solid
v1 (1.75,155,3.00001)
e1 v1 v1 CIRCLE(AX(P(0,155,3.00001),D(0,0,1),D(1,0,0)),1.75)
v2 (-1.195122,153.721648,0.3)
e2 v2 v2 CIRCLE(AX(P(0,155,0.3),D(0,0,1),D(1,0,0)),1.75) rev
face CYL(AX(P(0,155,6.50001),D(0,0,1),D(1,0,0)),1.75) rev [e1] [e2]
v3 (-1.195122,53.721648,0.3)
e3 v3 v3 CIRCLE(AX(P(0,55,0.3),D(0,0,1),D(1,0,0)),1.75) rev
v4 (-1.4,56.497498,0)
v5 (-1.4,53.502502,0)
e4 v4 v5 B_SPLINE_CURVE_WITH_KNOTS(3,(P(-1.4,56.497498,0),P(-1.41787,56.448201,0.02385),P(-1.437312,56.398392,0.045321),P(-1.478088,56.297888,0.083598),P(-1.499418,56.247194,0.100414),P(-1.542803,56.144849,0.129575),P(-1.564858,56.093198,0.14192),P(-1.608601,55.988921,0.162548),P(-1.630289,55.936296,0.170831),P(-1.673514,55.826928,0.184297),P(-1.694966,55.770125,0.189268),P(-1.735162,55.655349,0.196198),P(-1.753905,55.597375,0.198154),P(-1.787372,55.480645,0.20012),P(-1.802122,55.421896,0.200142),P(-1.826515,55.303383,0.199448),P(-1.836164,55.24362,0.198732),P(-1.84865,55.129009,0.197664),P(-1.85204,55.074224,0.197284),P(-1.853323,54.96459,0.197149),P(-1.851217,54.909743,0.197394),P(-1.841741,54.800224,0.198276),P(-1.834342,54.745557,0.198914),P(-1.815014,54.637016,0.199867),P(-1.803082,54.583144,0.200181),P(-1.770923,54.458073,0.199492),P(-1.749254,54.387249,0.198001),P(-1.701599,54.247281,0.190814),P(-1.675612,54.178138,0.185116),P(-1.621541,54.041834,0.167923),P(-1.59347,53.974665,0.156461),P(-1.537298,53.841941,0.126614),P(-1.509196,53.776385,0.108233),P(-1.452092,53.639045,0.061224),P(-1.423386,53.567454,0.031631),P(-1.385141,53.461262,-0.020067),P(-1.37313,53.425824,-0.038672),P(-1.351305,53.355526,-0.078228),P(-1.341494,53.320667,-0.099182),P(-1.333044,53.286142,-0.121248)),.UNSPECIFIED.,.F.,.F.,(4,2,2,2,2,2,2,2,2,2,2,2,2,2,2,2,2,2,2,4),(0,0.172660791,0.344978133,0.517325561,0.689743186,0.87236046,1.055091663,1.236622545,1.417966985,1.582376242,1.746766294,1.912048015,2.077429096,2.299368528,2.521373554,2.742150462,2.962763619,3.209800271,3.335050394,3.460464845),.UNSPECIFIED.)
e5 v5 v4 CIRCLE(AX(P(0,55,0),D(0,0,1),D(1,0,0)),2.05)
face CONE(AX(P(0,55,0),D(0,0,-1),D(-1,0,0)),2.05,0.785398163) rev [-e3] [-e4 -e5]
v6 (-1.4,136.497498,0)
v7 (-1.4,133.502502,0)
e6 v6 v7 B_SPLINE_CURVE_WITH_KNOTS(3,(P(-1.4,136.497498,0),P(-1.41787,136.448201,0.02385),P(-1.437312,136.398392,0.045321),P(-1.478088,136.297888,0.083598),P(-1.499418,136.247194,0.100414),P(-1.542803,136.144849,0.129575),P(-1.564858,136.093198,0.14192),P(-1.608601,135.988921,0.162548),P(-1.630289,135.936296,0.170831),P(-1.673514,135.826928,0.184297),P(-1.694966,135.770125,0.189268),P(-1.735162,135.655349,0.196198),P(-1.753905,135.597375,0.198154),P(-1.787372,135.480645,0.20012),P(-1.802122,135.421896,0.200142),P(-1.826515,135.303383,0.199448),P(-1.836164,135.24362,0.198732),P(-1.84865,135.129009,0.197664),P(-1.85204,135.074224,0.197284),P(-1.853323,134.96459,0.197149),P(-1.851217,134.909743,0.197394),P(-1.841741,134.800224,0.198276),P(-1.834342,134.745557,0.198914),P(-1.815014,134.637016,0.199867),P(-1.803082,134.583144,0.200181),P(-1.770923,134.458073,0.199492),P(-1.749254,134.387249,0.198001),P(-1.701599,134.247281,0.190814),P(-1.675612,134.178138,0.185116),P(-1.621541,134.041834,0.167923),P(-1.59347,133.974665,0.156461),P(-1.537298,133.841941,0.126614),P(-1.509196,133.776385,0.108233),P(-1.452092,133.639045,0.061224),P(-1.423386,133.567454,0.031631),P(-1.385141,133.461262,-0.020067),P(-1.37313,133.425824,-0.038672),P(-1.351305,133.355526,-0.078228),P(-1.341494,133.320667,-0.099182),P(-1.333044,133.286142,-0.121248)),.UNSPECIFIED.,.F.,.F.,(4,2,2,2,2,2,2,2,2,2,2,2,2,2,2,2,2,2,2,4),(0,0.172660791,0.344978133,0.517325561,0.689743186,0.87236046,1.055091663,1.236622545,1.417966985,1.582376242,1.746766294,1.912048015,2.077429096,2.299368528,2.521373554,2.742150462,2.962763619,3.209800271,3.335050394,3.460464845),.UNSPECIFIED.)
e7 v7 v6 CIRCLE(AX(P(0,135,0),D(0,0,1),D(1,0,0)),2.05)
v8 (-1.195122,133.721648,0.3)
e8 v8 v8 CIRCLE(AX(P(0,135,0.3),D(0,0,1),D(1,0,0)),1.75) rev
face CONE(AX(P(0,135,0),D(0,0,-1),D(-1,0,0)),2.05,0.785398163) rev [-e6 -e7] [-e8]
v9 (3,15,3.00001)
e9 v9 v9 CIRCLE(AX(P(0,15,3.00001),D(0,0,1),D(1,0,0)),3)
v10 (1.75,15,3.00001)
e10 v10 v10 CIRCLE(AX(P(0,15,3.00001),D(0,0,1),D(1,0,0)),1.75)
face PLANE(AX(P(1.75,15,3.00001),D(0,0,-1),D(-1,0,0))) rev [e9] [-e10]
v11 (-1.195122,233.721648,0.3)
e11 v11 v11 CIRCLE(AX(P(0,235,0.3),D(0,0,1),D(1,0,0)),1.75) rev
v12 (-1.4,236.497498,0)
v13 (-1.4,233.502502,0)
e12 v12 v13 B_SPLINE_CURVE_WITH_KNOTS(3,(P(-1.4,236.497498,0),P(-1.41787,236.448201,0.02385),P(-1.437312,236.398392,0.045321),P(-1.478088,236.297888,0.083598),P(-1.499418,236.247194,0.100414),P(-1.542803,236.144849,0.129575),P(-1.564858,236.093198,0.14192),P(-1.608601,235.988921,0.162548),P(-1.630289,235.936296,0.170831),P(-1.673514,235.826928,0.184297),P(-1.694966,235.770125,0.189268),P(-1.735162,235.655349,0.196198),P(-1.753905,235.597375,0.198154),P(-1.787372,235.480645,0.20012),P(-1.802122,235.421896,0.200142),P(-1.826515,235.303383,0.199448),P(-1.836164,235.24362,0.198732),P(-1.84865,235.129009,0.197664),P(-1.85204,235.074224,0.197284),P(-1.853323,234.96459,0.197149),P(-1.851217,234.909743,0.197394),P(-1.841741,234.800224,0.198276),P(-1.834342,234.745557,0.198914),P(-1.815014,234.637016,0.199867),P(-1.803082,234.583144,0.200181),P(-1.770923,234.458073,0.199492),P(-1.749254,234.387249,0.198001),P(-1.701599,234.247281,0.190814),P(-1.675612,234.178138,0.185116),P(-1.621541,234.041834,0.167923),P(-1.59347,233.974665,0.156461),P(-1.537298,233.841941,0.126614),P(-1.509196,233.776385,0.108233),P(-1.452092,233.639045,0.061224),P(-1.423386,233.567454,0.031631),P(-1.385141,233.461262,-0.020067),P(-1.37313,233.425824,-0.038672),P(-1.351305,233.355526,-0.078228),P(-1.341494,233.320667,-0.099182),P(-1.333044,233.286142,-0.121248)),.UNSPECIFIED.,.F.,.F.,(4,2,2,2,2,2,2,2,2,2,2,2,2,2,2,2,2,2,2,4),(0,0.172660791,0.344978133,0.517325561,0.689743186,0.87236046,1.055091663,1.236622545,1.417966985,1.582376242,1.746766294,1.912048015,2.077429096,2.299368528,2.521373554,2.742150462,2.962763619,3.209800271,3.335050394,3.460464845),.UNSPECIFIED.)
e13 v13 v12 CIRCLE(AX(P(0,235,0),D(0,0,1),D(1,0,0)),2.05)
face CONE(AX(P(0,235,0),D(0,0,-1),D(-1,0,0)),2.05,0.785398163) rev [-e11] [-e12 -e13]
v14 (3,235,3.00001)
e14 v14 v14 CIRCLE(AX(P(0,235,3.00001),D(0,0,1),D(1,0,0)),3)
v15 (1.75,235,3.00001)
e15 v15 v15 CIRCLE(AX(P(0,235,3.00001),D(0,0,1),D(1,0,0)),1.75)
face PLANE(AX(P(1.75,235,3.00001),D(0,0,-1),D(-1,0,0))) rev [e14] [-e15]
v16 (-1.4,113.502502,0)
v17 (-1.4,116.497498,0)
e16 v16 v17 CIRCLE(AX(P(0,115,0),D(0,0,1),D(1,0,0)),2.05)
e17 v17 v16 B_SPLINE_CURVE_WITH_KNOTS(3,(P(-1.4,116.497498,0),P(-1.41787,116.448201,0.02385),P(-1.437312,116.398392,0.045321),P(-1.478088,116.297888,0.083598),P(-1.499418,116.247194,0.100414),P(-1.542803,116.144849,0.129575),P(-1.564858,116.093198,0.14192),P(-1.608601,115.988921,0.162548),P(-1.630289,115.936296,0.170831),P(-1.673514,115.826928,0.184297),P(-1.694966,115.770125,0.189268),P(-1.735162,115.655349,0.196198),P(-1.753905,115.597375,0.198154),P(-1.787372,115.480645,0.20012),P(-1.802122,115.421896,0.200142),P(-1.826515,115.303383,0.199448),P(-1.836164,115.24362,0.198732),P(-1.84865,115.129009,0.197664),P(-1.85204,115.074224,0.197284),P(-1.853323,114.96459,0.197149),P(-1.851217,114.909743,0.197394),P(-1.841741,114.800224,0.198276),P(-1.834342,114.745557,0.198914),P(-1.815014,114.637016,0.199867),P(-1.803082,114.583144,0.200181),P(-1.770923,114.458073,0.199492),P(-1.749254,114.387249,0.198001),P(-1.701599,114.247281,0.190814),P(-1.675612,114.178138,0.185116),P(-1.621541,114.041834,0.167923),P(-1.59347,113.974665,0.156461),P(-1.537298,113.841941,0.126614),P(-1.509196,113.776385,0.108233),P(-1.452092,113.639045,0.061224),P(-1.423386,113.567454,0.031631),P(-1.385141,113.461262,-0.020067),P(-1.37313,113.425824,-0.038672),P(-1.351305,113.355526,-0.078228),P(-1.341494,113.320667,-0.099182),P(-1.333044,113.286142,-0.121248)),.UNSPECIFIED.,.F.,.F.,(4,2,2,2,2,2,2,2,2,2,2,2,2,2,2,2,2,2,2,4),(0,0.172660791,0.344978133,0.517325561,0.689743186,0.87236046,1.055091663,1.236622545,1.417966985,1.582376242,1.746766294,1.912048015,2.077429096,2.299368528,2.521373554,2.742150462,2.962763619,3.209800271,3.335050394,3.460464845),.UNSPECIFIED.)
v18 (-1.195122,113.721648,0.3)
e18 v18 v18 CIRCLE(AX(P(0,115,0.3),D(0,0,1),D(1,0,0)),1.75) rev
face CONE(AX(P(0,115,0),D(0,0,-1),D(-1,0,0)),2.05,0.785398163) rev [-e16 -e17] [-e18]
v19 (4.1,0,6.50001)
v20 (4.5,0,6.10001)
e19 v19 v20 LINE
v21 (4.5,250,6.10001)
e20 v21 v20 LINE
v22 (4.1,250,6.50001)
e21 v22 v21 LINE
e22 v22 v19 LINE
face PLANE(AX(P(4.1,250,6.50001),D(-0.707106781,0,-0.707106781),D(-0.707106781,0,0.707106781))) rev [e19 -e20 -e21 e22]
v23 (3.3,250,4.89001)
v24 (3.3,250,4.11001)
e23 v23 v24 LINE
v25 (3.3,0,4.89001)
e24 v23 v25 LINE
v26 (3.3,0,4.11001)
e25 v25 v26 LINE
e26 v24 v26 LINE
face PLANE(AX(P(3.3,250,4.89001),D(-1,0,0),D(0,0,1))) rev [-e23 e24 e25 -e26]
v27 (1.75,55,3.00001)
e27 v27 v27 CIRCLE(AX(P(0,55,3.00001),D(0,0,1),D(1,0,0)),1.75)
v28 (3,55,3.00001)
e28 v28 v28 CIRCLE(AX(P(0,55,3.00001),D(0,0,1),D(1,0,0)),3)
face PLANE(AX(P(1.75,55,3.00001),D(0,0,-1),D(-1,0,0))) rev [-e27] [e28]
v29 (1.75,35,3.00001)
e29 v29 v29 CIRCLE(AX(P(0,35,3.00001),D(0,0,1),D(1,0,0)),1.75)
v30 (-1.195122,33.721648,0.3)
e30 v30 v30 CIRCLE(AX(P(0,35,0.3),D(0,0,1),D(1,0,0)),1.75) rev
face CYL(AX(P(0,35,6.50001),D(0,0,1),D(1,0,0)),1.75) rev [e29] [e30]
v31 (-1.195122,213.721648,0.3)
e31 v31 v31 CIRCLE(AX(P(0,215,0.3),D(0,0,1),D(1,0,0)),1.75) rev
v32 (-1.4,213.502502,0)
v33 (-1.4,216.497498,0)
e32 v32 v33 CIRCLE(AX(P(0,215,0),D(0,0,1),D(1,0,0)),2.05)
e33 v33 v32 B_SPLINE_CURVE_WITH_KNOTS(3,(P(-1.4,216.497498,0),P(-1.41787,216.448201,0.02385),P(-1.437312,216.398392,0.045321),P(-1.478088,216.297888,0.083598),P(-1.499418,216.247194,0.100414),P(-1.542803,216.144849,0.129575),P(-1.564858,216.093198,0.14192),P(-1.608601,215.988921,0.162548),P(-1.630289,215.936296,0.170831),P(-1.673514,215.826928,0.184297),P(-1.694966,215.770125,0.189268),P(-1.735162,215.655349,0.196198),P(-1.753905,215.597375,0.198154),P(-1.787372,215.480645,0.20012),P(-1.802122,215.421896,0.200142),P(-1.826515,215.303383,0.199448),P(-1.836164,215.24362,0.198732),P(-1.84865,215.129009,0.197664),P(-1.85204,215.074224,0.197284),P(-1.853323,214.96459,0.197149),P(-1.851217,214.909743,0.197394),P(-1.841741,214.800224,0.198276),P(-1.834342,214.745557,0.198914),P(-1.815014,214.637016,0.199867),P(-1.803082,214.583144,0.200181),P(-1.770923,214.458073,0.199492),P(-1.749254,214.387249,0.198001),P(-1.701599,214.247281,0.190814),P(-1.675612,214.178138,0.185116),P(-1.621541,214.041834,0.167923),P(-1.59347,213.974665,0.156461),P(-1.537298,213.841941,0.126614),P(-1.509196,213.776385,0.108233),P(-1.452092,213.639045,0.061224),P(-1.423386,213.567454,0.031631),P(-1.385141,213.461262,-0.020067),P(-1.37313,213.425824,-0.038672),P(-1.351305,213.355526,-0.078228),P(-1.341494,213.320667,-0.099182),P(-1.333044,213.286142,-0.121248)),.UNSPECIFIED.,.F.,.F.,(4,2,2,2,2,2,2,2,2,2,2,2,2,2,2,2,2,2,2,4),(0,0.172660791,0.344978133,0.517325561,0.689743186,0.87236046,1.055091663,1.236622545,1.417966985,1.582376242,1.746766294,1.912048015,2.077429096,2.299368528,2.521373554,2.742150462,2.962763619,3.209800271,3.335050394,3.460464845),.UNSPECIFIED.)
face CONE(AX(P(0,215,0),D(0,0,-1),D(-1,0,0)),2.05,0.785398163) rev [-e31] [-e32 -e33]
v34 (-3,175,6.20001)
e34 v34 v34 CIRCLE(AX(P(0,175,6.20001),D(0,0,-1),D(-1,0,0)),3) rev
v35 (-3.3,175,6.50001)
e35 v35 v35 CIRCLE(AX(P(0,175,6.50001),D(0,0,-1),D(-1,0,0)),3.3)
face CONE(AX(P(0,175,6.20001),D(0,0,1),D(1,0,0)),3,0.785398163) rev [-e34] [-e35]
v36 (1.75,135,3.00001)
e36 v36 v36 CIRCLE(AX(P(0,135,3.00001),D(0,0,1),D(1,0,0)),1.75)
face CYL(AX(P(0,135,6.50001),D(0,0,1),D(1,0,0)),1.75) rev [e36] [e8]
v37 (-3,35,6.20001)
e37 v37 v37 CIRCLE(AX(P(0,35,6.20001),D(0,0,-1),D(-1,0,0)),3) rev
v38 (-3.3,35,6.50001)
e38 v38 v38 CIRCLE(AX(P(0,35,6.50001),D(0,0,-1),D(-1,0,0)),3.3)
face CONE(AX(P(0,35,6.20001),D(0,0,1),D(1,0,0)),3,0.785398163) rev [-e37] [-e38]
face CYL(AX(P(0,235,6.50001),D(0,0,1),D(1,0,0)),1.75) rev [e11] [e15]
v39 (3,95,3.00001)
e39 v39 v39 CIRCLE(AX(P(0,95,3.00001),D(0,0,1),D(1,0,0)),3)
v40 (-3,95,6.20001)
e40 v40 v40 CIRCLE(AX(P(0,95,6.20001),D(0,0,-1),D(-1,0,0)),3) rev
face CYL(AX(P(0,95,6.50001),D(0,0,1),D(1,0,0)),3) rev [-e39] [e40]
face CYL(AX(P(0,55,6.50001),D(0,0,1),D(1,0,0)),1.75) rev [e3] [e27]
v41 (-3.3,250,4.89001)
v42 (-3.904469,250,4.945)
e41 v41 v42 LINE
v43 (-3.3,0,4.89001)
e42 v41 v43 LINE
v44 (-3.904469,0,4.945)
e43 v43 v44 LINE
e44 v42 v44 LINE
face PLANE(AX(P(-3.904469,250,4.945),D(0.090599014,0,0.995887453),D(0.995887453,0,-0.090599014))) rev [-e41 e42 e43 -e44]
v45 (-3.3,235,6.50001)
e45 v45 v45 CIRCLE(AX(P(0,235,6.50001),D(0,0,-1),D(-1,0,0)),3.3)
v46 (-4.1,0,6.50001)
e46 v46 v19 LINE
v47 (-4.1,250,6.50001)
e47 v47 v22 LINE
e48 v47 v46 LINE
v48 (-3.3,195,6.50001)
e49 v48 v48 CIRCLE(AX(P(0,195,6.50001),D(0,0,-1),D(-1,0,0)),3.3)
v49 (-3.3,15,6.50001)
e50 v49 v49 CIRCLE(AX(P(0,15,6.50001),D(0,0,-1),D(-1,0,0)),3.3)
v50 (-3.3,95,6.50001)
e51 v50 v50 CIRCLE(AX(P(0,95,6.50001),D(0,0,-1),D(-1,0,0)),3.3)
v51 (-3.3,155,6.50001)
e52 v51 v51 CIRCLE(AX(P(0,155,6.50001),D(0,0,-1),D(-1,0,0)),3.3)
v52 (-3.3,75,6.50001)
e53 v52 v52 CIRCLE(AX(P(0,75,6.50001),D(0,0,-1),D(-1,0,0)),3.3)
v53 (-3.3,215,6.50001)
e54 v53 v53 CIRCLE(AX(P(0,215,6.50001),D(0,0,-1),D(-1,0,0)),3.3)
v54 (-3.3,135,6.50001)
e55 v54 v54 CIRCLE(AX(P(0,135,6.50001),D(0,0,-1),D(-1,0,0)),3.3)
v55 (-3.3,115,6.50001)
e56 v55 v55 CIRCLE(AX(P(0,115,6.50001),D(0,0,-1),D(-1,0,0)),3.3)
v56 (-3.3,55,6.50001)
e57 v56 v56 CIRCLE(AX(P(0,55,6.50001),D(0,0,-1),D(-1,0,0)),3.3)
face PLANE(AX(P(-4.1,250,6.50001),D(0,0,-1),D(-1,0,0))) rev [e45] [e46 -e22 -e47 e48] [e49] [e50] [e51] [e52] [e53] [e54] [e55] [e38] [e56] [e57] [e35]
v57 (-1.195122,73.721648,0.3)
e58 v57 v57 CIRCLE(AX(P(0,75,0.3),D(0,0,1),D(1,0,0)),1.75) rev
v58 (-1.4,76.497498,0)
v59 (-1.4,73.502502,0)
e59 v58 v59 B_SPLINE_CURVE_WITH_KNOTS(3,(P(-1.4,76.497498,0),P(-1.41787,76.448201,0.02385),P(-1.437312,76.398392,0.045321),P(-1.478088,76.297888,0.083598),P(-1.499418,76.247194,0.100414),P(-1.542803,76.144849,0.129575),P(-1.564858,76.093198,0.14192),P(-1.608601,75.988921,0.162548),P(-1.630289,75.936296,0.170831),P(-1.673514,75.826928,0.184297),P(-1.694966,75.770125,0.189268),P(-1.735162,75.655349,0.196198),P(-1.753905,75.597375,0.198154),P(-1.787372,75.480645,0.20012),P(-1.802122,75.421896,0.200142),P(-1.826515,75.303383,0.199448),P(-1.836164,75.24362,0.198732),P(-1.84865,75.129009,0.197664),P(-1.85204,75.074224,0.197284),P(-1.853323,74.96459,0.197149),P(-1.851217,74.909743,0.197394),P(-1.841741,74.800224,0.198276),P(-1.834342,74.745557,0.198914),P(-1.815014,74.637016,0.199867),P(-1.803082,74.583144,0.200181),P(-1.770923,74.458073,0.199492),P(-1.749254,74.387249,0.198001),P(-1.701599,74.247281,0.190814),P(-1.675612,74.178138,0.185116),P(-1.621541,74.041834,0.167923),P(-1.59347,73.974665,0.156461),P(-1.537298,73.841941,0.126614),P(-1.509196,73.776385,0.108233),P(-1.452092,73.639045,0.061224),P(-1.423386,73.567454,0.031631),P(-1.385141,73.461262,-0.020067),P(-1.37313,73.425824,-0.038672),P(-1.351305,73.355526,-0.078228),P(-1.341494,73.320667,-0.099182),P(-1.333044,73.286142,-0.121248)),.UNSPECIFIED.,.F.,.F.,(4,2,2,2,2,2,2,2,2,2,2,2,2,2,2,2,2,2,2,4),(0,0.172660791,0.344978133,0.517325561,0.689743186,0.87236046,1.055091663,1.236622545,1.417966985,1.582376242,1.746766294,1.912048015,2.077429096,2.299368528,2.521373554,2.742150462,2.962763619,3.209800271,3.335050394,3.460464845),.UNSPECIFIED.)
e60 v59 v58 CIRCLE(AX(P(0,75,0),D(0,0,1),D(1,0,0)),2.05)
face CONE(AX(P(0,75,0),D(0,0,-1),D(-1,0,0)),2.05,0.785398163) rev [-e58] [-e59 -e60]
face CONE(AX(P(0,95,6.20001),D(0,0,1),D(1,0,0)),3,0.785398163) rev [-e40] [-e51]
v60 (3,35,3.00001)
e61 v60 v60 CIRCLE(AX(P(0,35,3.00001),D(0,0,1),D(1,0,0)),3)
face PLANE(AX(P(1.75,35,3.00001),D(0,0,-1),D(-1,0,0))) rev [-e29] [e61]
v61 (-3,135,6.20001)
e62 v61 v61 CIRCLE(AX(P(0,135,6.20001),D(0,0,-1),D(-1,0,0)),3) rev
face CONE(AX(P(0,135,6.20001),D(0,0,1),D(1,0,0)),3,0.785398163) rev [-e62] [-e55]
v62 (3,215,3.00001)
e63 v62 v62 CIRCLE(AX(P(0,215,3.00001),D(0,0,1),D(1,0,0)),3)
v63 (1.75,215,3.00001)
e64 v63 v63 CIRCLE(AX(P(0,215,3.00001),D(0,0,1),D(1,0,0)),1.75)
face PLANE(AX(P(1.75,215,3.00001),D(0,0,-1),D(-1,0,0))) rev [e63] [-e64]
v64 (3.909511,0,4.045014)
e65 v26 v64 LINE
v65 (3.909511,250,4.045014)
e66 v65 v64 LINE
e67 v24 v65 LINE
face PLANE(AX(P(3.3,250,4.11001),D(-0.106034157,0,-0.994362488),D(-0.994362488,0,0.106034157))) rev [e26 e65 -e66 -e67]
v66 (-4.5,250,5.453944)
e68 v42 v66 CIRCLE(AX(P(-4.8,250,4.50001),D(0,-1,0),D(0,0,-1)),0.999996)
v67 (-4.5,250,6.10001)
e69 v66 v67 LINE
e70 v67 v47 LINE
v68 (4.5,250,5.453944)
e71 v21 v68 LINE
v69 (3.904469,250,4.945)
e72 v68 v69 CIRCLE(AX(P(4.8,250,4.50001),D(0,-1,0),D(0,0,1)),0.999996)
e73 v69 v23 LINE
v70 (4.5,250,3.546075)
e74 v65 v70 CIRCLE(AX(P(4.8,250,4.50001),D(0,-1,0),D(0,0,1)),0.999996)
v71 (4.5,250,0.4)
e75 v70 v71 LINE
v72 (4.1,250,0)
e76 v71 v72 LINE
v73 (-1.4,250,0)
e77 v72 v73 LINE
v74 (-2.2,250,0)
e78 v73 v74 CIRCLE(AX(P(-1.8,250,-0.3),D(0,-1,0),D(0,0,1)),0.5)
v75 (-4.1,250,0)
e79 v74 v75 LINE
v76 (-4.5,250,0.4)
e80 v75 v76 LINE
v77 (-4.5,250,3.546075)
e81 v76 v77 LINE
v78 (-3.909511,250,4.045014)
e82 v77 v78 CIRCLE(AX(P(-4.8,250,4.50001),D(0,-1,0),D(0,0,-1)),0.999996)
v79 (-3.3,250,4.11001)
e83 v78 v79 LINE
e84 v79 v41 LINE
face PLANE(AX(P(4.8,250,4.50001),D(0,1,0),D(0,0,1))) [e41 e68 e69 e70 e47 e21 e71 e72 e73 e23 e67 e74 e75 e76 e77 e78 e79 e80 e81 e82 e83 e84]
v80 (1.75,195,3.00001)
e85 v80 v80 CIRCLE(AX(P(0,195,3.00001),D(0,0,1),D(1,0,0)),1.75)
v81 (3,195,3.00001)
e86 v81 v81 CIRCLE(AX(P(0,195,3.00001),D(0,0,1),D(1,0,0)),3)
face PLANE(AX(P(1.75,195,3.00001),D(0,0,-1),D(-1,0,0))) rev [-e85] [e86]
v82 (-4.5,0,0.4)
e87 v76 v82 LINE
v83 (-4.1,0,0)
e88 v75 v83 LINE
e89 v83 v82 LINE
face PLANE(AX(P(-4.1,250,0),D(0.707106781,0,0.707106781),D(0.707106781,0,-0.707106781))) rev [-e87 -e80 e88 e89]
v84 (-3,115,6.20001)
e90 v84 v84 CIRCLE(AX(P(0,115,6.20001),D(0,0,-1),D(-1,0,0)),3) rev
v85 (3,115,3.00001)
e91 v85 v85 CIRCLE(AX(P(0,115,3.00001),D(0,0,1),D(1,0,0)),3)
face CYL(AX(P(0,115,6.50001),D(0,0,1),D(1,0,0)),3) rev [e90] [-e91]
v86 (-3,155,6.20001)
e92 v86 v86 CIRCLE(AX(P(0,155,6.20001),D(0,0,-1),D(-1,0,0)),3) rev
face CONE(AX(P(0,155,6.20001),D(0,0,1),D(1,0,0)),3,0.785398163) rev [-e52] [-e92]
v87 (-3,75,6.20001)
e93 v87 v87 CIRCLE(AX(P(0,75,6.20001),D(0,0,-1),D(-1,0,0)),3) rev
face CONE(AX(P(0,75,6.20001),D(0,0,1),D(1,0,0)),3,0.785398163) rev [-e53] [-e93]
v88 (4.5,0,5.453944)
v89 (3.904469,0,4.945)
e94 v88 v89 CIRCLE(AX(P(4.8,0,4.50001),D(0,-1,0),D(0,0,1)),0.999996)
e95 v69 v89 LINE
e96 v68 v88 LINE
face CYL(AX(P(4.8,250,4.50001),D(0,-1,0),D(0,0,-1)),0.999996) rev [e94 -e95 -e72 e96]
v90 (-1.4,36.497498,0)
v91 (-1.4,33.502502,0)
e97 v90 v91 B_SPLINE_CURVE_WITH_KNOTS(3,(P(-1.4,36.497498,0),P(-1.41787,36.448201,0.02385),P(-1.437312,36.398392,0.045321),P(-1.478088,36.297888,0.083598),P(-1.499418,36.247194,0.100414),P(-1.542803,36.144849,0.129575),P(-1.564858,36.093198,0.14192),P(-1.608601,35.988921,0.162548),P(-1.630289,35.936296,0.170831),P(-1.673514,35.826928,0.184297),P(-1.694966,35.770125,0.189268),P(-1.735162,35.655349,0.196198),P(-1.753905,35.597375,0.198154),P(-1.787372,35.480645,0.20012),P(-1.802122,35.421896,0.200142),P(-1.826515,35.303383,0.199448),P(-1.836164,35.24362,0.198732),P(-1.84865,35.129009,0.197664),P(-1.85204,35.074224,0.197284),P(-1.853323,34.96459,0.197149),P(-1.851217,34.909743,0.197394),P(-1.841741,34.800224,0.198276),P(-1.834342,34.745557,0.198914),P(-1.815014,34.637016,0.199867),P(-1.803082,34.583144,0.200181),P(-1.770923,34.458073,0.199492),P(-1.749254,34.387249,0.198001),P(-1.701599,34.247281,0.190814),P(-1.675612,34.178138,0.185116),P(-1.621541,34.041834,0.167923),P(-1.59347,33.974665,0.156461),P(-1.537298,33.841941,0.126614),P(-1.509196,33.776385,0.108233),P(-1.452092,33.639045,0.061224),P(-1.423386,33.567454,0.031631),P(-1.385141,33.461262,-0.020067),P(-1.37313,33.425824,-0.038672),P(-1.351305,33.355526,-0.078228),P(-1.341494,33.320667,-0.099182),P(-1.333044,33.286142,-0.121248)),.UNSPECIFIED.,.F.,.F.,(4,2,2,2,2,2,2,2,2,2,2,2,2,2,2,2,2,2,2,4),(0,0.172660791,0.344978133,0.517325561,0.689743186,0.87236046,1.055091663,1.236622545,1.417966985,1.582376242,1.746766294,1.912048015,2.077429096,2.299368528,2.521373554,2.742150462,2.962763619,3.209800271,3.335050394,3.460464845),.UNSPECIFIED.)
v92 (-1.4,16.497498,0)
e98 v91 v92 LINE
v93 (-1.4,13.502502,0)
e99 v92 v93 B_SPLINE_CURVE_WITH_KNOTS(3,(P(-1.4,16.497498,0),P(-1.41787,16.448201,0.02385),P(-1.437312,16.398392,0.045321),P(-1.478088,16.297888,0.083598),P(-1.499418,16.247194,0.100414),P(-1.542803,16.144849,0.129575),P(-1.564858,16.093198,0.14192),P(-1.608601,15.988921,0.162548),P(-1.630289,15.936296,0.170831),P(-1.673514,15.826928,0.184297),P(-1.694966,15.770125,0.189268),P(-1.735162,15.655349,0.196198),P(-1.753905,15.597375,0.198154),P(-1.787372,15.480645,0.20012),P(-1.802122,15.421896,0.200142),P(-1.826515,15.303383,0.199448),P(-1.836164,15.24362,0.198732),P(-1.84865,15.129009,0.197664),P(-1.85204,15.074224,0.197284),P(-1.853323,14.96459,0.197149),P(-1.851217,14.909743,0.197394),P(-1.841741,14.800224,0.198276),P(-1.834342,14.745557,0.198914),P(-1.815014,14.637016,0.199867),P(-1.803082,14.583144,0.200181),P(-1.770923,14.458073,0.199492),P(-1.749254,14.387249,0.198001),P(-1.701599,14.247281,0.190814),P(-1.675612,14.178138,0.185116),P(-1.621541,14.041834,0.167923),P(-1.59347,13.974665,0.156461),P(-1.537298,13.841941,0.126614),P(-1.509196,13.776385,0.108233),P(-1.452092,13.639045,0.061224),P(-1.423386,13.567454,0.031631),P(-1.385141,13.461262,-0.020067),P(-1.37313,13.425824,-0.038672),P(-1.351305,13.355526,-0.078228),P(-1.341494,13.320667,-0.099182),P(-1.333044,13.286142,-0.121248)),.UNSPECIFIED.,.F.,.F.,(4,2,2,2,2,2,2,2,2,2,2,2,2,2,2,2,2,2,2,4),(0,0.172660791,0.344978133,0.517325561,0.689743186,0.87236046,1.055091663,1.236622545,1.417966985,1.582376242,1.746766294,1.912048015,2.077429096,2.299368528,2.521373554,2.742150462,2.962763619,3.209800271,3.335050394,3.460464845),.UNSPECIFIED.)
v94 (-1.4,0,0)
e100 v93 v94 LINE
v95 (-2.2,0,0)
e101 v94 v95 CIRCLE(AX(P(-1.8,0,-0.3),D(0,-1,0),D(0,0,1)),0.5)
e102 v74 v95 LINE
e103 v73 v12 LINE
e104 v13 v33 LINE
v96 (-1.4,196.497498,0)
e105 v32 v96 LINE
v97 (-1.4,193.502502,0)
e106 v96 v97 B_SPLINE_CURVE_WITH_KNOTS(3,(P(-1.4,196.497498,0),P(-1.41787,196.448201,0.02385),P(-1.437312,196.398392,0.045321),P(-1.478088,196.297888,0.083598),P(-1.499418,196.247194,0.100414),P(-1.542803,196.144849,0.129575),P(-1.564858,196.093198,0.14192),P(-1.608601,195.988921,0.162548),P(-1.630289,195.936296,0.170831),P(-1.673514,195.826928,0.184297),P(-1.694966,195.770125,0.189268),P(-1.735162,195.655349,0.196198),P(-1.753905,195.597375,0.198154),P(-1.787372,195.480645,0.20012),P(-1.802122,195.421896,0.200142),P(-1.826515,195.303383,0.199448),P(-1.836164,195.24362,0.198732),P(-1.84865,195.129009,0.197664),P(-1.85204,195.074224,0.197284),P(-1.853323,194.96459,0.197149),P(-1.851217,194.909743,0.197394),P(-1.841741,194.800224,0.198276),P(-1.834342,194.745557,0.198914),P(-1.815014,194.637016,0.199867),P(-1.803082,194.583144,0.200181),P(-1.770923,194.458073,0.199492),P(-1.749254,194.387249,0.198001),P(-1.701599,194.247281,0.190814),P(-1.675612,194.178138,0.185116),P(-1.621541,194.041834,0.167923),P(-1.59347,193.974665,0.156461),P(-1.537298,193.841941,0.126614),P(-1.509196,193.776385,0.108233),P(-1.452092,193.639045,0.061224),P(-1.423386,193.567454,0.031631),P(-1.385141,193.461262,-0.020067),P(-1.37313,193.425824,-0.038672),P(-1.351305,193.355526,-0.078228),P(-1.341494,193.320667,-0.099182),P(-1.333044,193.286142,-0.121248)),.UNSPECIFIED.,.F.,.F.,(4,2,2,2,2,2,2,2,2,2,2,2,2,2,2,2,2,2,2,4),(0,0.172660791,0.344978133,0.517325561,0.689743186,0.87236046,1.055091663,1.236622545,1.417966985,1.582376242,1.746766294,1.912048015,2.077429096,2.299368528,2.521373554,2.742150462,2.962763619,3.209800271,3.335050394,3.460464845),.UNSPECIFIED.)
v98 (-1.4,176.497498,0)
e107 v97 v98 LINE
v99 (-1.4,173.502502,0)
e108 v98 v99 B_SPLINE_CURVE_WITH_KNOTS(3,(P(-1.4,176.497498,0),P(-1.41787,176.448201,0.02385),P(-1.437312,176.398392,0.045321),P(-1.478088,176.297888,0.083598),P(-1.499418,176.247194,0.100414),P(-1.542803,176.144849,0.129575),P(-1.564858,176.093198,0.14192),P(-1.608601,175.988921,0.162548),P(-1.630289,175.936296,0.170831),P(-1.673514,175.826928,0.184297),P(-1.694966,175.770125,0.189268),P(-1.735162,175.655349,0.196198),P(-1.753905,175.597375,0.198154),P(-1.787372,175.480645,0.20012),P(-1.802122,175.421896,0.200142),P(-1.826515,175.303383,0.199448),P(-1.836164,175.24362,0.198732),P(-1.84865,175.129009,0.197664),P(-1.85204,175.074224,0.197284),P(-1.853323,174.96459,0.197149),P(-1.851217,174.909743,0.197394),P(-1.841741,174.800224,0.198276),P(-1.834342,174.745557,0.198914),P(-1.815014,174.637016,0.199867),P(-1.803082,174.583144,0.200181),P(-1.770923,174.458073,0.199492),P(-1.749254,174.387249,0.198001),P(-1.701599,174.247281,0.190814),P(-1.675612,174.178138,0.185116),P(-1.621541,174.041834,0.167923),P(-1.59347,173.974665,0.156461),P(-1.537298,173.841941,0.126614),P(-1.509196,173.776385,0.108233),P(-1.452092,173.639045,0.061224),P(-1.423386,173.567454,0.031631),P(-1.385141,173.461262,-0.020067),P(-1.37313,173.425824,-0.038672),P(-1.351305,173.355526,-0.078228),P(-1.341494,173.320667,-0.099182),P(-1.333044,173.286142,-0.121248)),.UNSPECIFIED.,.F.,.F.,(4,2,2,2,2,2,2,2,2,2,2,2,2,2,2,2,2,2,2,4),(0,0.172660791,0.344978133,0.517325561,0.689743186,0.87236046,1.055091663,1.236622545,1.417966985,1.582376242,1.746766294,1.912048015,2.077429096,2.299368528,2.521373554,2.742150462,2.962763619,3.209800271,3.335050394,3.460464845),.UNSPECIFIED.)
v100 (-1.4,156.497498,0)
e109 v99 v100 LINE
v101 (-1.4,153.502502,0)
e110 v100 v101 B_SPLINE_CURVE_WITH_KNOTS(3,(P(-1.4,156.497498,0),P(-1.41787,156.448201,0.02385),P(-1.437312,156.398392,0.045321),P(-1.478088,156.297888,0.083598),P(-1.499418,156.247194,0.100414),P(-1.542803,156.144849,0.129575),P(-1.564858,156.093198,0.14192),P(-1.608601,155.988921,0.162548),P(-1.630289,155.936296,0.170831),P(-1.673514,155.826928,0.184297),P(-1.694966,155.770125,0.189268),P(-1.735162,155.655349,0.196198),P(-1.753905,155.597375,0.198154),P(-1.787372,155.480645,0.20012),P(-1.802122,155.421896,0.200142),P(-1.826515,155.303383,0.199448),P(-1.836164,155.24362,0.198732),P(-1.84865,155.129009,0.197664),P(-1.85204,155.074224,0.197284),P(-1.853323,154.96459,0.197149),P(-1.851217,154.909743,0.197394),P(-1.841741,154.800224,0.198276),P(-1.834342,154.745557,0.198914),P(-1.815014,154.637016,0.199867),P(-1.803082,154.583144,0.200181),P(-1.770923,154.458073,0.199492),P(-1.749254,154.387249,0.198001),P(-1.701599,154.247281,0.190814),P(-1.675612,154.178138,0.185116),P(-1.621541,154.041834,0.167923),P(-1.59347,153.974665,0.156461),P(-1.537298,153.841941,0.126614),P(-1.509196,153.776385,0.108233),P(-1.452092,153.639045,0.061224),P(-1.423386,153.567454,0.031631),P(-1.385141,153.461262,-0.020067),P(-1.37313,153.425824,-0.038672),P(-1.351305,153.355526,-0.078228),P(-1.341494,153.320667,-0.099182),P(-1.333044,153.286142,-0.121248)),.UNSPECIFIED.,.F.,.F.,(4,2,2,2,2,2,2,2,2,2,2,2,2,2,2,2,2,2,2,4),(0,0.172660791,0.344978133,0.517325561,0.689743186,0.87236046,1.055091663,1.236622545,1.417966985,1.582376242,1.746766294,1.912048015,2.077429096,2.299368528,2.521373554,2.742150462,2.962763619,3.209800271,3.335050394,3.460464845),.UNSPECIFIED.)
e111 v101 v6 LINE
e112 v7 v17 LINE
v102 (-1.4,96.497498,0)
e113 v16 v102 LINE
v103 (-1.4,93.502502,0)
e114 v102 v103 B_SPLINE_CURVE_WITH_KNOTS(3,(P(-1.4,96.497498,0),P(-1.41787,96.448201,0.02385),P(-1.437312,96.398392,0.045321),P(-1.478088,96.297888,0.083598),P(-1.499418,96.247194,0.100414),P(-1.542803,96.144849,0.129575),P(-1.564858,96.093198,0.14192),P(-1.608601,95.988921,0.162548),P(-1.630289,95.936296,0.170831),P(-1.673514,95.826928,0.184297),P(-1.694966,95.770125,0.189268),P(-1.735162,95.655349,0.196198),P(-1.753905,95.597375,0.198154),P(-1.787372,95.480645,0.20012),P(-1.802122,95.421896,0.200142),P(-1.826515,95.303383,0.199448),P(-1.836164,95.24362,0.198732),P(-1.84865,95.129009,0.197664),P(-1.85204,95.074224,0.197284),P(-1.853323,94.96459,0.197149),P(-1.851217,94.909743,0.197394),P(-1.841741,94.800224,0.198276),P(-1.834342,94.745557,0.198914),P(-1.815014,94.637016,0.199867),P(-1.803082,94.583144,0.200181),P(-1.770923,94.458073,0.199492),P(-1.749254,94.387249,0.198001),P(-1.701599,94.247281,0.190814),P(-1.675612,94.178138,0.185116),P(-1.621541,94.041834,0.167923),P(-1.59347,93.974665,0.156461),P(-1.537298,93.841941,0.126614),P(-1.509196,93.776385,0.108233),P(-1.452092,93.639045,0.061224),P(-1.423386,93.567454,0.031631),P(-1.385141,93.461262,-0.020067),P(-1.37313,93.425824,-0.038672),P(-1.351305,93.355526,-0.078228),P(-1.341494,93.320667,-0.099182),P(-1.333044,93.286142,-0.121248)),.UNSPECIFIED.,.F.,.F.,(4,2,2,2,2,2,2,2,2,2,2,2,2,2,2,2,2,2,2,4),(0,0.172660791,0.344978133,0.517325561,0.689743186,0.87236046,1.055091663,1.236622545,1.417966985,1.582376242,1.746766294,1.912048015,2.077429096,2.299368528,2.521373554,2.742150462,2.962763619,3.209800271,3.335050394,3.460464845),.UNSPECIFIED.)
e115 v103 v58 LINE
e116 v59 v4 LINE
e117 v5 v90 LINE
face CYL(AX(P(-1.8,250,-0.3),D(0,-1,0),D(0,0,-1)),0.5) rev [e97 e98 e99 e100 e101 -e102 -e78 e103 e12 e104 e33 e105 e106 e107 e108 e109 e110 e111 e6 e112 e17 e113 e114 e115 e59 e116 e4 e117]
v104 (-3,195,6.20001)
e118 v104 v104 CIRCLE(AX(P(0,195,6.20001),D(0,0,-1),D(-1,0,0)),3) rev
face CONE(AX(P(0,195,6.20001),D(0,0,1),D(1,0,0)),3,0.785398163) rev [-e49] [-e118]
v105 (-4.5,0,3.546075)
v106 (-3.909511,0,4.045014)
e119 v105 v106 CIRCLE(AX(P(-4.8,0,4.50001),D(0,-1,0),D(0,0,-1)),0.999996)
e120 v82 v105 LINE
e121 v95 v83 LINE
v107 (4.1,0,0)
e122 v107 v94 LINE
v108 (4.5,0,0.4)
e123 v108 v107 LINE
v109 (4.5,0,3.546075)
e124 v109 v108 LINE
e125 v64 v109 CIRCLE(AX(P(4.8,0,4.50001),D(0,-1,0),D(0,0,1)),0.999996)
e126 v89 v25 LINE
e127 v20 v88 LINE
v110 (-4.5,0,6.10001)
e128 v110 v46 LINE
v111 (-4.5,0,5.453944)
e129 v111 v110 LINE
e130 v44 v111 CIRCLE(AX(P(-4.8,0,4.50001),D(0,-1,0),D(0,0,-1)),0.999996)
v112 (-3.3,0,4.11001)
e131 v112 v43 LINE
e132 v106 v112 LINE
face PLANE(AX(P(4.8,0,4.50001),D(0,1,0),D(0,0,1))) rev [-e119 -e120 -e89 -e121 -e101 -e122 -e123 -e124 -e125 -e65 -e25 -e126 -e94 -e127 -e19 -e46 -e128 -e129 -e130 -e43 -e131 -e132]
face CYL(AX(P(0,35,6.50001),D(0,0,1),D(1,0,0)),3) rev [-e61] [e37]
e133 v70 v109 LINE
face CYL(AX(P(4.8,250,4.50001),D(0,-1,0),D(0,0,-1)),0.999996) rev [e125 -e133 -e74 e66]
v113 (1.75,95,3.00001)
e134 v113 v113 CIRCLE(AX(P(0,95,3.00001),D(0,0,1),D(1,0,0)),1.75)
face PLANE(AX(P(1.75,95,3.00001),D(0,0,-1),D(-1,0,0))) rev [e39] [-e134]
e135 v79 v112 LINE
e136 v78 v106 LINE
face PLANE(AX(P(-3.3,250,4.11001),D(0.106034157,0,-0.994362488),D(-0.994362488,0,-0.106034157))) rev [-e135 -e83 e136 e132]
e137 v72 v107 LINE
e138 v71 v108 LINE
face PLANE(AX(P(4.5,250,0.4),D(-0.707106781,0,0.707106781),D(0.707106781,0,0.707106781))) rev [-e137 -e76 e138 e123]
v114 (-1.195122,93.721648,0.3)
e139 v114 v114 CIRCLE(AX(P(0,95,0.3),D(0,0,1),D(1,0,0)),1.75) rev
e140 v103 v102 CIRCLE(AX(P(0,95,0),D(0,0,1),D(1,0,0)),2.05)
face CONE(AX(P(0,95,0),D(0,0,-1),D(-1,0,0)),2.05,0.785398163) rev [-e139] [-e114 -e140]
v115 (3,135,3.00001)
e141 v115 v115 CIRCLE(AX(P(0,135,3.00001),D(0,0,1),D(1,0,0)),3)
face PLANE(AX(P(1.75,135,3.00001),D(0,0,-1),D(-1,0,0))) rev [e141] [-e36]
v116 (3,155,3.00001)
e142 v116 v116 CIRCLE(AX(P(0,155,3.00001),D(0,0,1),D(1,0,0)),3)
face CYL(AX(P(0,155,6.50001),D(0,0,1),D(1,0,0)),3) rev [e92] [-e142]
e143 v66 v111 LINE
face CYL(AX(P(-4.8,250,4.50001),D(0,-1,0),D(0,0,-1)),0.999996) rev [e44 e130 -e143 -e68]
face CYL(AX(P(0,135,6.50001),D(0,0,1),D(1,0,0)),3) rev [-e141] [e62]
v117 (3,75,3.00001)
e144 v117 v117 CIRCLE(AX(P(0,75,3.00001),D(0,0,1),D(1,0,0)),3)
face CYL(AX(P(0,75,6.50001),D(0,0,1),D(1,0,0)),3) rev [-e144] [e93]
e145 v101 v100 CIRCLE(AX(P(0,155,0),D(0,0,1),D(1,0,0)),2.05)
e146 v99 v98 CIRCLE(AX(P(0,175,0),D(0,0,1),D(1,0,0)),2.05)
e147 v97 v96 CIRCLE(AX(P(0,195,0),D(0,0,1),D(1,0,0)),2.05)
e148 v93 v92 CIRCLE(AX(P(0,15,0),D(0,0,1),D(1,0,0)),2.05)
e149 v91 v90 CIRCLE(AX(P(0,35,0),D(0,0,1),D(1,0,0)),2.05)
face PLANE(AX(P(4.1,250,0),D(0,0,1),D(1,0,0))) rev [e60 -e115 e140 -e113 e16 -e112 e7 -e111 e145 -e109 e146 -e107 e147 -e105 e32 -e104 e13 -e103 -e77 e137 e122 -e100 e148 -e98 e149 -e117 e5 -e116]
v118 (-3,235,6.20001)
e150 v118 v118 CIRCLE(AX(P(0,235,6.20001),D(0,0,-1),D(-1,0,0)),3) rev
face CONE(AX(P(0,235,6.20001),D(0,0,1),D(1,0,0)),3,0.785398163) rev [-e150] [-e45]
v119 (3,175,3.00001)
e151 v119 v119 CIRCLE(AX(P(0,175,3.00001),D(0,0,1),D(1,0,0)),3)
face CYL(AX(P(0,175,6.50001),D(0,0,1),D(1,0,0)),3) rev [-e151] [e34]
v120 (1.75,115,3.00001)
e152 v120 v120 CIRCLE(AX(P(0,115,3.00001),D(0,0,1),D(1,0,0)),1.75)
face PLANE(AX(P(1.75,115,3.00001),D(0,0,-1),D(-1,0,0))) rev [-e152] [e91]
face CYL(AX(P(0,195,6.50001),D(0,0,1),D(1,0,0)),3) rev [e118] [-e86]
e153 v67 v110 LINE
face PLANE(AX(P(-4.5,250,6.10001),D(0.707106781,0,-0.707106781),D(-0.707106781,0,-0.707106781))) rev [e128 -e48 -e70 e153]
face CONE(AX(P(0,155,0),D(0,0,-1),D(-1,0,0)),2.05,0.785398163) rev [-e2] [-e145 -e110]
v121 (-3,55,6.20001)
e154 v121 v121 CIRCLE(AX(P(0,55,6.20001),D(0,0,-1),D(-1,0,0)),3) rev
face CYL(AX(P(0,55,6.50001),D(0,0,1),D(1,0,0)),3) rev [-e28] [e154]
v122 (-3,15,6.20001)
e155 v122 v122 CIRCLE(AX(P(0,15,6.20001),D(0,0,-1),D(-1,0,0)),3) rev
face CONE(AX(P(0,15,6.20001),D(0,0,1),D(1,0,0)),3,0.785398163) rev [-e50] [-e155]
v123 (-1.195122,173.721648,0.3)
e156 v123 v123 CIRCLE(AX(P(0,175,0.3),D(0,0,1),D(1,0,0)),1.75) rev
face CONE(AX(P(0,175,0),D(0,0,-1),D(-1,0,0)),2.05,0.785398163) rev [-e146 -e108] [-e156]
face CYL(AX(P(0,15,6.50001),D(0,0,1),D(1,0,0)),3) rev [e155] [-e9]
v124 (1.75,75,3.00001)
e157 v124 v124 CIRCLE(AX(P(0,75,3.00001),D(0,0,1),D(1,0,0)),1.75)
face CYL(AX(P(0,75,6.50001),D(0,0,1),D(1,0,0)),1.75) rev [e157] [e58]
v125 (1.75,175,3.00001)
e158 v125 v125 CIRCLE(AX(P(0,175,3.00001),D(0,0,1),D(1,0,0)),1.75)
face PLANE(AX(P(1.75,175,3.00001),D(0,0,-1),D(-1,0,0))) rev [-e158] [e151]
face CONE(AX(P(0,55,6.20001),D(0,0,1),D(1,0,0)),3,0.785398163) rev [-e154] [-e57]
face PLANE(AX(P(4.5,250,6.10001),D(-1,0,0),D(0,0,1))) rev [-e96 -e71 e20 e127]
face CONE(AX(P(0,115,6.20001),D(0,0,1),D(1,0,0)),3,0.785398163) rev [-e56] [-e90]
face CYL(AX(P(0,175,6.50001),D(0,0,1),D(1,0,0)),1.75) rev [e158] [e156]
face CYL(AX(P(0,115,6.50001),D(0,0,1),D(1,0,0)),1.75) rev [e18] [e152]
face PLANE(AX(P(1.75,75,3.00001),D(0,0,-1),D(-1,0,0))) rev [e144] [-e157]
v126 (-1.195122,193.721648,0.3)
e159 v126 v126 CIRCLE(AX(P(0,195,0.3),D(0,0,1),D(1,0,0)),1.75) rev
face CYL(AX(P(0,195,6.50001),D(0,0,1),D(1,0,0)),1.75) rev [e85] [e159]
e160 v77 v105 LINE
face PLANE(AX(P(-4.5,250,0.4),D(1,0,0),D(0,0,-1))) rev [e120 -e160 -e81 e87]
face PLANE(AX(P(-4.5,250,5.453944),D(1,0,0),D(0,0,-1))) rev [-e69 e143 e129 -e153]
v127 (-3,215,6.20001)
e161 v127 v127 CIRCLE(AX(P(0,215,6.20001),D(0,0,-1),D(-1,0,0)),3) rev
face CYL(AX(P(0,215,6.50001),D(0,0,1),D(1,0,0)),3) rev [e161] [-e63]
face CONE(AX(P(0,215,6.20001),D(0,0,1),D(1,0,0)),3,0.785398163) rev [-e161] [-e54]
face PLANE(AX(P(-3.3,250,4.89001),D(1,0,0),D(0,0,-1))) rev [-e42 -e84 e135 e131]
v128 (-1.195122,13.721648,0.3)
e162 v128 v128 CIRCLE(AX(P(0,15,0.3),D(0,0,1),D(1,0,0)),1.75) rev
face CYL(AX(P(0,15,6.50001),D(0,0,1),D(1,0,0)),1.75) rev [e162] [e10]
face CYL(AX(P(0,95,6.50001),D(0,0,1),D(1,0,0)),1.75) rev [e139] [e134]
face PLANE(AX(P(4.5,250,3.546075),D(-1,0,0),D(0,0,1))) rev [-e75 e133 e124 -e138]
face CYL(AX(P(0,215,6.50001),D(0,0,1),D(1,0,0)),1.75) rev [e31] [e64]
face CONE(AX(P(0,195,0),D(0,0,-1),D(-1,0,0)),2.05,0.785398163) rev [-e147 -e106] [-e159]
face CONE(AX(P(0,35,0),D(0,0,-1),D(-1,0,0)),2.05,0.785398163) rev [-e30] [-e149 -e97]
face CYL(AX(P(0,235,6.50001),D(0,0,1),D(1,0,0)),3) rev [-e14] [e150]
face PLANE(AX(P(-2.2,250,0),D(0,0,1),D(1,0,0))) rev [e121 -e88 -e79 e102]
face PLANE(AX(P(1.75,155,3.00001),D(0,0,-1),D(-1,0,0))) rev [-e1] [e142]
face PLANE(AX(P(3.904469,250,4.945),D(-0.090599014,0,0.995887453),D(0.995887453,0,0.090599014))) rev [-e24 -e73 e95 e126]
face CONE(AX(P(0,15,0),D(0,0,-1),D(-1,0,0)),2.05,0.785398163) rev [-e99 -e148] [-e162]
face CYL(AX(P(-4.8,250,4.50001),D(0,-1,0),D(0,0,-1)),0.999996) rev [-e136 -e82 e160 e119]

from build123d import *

# Parameters (mm, degrees)
DELKA_DEPTH       = 250
D_RA1_D           = 3.5
D_RA1_CBORE_D     = 6
D_RA1_CBORE_DEPTH = 3.5
LINPOLE1_COUNT    = 12
LINPOLE1_PITCH    = 20


with BuildPart() as part:
    # Skica1 → Delka (new body)
    with BuildSketch(Plane(origin=(0, 0, 0), x_dir=(1, 0, 0), z_dir=(0, 1, 0))):
        with BuildLine():
            Line((-4.1, -6.500009514), (4.1, -6.500009514))
            Line((4.1, -6.500009514), (4.5, -6.100009514))
            Line((4.5, -6.100009514), (4.5, -5.453944278))
            ThreePointArc((4.5, -5.453944278), (4.150323615, -5.260214834), (3.904469431, -4.945))
            Line((3.904469431, -4.945), (3.3, -4.890009514))
            Line((3.3, -4.890009514), (3.3, -4.110009514))
            Line((3.3, -4.110009514), (3.909510964, -4.045014121))
            ThreePointArc((3.909510964, -4.045014121), (4.154592253, -3.736176828), (4.5, -3.546074751))
            Line((4.5, -3.546074751), (4.5, -0.4))
            Line((4.5, -0.4), (4.1, 0))
            Line((4.1, 0), (-1.4, 0))
            ThreePointArc((-1.4, 0), (-1.8, -0.2), (-2.2, 0))
            Line((-2.2, 0), (-4.1, 0))
            Line((-4.1, 0), (-4.5, -0.4))
            Line((-4.5, -0.4), (-4.5, -3.546074751))
            ThreePointArc((-4.5, -3.546074751), (-4.154592253, -3.736176828), (-3.909510964, -4.045014121))
            Line((-3.909510964, -4.045014121), (-3.3, -4.110009514))
            Line((-3.3, -4.110009514), (-3.3, -4.890009514))
            Line((-3.3, -4.890009514), (-3.904469431, -4.945))
            ThreePointArc((-3.904469431, -4.945), (-4.150323615, -5.260214834), (-4.5, -5.453944278))
            Line((-4.5, -5.453944278), (-4.5, -6.100009514))
            Line((-4.5, -6.100009514), (-4.1, -6.500009514))
        make_face()
    extrude(amount=DELKA_DEPTH)

    # Díra1 (through all)
    with Locations(Plane.XY.offset(6.500009514)):
        with Locations((0, 15)):
            d_ra1 = CounterBoreHole(D_RA1_D / 2, D_RA1_CBORE_D / 2, D_RA1_CBORE_DEPTH)

    # Zkosení1: read off the stored shape, not the designer's step
    # Zkosení1 outline → Zkosení1 (revolve, cut)
    with BuildSketch(Plane.XZ.offset(-15)):
        Polygon((2.050000176, -1.76e-07), (1.75, 0.3), (1.75, -1.76e-07), align=None)
        Polygon((3, 6.500009514), (3, 6.200009514), (3.3, 6.500009514), align=None)
    zkosen_1 = revolve(axis=Axis((0, 15, 0), (0, 0, 1)), mode=Mode.SUBTRACT)

    # LinPole1: Díra1, Zkosení1 ×12
    with Locations(*[(0, i * LINPOLE1_PITCH, 0) for i in range(1, LINPOLE1_COUNT)]):
        add(d_ra1, mode=Mode.SUBTRACT)
        add(zkosen_1, mode=Mode.SUBTRACT)


solid = part.part
